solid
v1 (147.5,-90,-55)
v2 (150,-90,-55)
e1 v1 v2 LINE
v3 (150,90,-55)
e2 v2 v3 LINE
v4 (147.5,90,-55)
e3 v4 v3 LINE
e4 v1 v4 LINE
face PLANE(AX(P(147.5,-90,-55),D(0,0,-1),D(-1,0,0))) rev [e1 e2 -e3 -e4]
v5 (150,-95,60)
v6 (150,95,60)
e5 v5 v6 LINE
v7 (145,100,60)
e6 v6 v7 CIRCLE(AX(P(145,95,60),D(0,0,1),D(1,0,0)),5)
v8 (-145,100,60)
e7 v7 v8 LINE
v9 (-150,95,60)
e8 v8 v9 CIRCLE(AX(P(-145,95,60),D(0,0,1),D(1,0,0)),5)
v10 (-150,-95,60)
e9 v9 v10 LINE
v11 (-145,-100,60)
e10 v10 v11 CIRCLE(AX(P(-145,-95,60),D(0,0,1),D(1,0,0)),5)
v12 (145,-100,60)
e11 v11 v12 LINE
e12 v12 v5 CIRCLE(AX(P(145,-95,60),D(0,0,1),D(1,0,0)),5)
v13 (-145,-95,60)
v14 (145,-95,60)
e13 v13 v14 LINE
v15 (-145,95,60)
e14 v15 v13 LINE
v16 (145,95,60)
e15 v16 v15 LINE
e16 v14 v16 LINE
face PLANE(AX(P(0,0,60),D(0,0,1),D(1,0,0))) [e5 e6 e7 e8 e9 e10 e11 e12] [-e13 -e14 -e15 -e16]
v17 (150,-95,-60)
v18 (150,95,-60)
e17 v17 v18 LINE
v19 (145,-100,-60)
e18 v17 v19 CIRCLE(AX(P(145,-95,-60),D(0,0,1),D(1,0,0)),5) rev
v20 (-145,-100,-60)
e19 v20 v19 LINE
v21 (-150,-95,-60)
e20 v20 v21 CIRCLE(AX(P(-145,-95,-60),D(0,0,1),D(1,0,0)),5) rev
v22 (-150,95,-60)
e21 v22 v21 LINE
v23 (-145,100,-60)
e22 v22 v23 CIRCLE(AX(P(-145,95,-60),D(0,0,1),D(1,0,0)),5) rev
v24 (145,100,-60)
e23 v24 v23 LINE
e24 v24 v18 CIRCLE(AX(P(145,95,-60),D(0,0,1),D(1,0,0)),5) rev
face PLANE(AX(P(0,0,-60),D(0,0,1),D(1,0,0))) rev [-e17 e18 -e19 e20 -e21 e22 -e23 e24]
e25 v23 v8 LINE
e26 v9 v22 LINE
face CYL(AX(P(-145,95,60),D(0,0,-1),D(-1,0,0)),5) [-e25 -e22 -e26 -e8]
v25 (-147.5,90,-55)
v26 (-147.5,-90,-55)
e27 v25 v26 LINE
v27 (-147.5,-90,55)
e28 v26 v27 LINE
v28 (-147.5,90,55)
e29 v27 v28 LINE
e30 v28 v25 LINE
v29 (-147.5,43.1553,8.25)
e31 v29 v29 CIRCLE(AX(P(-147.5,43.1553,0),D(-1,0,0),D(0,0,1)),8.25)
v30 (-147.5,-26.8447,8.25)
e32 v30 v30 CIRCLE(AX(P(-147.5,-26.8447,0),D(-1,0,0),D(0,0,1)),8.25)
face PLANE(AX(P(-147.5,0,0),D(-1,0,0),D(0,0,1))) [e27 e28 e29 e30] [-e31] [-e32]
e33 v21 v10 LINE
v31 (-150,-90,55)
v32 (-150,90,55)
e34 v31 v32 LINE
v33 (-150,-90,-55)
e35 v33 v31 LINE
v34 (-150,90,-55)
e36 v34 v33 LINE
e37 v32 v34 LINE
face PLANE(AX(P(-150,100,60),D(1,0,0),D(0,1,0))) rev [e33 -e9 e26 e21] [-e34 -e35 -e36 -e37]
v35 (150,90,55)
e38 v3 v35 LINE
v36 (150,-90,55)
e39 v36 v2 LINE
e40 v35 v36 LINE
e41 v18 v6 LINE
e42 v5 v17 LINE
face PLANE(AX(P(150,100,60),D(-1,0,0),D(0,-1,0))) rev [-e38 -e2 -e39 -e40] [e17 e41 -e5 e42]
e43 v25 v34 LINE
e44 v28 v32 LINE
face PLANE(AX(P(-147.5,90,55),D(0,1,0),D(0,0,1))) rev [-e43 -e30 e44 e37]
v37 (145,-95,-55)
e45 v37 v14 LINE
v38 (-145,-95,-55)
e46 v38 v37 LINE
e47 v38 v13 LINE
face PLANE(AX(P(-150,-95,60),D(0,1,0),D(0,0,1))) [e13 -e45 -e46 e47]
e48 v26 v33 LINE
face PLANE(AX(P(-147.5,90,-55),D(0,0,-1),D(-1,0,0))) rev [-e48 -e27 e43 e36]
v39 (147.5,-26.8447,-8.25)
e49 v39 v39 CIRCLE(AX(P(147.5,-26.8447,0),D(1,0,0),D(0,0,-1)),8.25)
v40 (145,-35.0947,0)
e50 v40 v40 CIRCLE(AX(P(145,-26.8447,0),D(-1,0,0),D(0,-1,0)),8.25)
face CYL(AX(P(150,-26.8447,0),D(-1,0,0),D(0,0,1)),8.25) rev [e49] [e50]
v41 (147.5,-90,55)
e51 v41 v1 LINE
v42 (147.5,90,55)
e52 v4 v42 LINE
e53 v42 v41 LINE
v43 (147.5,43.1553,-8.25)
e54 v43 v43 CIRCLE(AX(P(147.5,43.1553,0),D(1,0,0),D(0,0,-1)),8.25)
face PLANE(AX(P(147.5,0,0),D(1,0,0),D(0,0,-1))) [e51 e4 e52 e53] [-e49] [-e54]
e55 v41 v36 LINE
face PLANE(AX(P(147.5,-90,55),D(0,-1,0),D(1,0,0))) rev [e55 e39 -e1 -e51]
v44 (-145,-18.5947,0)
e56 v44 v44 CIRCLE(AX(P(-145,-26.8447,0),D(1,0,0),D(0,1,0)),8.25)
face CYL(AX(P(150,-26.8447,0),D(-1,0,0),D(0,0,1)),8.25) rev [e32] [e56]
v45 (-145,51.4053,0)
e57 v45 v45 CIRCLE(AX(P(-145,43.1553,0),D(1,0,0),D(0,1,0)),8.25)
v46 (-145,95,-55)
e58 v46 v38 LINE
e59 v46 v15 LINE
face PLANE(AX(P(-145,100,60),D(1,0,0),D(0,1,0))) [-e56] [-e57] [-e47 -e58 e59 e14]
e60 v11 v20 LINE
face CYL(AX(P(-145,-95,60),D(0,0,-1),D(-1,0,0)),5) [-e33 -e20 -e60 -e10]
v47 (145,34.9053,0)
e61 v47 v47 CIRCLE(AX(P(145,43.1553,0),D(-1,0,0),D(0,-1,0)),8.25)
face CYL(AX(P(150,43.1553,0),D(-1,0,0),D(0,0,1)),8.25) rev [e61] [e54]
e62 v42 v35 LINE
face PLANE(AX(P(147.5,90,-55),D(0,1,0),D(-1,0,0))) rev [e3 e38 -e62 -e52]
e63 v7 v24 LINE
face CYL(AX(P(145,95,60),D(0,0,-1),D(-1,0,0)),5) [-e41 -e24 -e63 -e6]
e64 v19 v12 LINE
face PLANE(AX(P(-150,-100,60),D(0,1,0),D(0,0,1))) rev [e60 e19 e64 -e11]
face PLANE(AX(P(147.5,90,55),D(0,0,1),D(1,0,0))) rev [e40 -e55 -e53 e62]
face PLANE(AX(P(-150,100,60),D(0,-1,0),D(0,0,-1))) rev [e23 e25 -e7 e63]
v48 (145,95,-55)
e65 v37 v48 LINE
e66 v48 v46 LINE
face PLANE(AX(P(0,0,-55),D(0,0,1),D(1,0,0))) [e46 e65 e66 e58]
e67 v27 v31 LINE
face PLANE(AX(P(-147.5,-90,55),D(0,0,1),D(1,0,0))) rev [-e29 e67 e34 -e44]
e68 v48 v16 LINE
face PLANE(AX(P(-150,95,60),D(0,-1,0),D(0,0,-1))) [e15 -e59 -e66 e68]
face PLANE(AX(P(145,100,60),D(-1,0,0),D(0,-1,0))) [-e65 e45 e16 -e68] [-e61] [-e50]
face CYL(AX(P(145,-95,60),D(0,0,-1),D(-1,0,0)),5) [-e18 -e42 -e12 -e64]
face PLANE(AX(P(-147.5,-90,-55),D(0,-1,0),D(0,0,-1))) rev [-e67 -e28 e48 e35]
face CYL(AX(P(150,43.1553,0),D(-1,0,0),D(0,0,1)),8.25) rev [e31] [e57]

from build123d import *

# Parameters (mm, degrees)
SKETCH1_W           = 300
SKETCH1_H           = 200
BOSS_EXTRUDE1_DEPTH = 60
FILLET1_R           = 5
SHELL1_START        = -145
SHELL1_OUTLINE_W    = 190
SHELL1_OUTLINE_H    = 115
SHELL1_DEPTH        = 290
SKETCH5_W           = 110
SKETCH5_H           = 180
CUT_EXTRUDE1_DEPTH  = 2.5
SKETCH6_W           = 110
SKETCH6_H           = 180
CUT_EXTRUDE2_DEPTH  = 2.5
SKETCH7_R           = 8.25
CUT_EXTRUDE3_DEPTH  = 320.540685985


# Read off the part's stored shape, not the designer's step: Shell1
with BuildPart() as part:
    # Sketch1 → Boss-Extrude1 (new, symmetric)
    with BuildSketch(Plane.XY):
        Rectangle(SKETCH1_W, SKETCH1_H)
    extrude(amount=BOSS_EXTRUDE1_DEPTH, both=True)

    # Fillet1
    fillet1_edges = [part.edges().sort_by_distance(p)[0] for p in [
        (150, -100, 0),
        (-150, -100, 0),
        (-150, 100, 0),
        (150, 100, 0),
    ]]
    fillet(fillet1_edges, radius=FILLET1_R)

    # Shell1 outline → Shell1 (cut)
    with BuildSketch(Plane.YZ.offset(SHELL1_START)):
        with Locations((0, 2.5)):
            Rectangle(SHELL1_OUTLINE_W, SHELL1_OUTLINE_H)
    extrude(amount=SHELL1_DEPTH, mode=Mode.SUBTRACT)

    # Sketch5 → Cut-Extrude1 (cut)
    with BuildSketch(Plane(origin=(150, 0, 0), x_dir=(0, 0, -1), z_dir=(1, 0, 0))):
        Rectangle(SKETCH5_W, SKETCH5_H)
    extrude(amount=-CUT_EXTRUDE1_DEPTH, mode=Mode.SUBTRACT)

    # Sketch6 → Cut-Extrude2 (cut)
    with BuildSketch(Plane.ZY.offset(150)):
        Rectangle(SKETCH6_W, SKETCH6_H)
    extrude(amount=-CUT_EXTRUDE2_DEPTH, mode=Mode.SUBTRACT)

    # Sketch7 → Cut-Extrude3 (cut, through all)
    with BuildSketch(Plane.ZY.offset(147.5)):
        with Locations((0, 43.15529971)):
            Circle(SKETCH7_R)
        with Locations((0, -26.84470029)):
            Circle(SKETCH7_R)
    extrude(amount=-CUT_EXTRUDE3_DEPTH, mode=Mode.SUBTRACT)


solid = part.part
